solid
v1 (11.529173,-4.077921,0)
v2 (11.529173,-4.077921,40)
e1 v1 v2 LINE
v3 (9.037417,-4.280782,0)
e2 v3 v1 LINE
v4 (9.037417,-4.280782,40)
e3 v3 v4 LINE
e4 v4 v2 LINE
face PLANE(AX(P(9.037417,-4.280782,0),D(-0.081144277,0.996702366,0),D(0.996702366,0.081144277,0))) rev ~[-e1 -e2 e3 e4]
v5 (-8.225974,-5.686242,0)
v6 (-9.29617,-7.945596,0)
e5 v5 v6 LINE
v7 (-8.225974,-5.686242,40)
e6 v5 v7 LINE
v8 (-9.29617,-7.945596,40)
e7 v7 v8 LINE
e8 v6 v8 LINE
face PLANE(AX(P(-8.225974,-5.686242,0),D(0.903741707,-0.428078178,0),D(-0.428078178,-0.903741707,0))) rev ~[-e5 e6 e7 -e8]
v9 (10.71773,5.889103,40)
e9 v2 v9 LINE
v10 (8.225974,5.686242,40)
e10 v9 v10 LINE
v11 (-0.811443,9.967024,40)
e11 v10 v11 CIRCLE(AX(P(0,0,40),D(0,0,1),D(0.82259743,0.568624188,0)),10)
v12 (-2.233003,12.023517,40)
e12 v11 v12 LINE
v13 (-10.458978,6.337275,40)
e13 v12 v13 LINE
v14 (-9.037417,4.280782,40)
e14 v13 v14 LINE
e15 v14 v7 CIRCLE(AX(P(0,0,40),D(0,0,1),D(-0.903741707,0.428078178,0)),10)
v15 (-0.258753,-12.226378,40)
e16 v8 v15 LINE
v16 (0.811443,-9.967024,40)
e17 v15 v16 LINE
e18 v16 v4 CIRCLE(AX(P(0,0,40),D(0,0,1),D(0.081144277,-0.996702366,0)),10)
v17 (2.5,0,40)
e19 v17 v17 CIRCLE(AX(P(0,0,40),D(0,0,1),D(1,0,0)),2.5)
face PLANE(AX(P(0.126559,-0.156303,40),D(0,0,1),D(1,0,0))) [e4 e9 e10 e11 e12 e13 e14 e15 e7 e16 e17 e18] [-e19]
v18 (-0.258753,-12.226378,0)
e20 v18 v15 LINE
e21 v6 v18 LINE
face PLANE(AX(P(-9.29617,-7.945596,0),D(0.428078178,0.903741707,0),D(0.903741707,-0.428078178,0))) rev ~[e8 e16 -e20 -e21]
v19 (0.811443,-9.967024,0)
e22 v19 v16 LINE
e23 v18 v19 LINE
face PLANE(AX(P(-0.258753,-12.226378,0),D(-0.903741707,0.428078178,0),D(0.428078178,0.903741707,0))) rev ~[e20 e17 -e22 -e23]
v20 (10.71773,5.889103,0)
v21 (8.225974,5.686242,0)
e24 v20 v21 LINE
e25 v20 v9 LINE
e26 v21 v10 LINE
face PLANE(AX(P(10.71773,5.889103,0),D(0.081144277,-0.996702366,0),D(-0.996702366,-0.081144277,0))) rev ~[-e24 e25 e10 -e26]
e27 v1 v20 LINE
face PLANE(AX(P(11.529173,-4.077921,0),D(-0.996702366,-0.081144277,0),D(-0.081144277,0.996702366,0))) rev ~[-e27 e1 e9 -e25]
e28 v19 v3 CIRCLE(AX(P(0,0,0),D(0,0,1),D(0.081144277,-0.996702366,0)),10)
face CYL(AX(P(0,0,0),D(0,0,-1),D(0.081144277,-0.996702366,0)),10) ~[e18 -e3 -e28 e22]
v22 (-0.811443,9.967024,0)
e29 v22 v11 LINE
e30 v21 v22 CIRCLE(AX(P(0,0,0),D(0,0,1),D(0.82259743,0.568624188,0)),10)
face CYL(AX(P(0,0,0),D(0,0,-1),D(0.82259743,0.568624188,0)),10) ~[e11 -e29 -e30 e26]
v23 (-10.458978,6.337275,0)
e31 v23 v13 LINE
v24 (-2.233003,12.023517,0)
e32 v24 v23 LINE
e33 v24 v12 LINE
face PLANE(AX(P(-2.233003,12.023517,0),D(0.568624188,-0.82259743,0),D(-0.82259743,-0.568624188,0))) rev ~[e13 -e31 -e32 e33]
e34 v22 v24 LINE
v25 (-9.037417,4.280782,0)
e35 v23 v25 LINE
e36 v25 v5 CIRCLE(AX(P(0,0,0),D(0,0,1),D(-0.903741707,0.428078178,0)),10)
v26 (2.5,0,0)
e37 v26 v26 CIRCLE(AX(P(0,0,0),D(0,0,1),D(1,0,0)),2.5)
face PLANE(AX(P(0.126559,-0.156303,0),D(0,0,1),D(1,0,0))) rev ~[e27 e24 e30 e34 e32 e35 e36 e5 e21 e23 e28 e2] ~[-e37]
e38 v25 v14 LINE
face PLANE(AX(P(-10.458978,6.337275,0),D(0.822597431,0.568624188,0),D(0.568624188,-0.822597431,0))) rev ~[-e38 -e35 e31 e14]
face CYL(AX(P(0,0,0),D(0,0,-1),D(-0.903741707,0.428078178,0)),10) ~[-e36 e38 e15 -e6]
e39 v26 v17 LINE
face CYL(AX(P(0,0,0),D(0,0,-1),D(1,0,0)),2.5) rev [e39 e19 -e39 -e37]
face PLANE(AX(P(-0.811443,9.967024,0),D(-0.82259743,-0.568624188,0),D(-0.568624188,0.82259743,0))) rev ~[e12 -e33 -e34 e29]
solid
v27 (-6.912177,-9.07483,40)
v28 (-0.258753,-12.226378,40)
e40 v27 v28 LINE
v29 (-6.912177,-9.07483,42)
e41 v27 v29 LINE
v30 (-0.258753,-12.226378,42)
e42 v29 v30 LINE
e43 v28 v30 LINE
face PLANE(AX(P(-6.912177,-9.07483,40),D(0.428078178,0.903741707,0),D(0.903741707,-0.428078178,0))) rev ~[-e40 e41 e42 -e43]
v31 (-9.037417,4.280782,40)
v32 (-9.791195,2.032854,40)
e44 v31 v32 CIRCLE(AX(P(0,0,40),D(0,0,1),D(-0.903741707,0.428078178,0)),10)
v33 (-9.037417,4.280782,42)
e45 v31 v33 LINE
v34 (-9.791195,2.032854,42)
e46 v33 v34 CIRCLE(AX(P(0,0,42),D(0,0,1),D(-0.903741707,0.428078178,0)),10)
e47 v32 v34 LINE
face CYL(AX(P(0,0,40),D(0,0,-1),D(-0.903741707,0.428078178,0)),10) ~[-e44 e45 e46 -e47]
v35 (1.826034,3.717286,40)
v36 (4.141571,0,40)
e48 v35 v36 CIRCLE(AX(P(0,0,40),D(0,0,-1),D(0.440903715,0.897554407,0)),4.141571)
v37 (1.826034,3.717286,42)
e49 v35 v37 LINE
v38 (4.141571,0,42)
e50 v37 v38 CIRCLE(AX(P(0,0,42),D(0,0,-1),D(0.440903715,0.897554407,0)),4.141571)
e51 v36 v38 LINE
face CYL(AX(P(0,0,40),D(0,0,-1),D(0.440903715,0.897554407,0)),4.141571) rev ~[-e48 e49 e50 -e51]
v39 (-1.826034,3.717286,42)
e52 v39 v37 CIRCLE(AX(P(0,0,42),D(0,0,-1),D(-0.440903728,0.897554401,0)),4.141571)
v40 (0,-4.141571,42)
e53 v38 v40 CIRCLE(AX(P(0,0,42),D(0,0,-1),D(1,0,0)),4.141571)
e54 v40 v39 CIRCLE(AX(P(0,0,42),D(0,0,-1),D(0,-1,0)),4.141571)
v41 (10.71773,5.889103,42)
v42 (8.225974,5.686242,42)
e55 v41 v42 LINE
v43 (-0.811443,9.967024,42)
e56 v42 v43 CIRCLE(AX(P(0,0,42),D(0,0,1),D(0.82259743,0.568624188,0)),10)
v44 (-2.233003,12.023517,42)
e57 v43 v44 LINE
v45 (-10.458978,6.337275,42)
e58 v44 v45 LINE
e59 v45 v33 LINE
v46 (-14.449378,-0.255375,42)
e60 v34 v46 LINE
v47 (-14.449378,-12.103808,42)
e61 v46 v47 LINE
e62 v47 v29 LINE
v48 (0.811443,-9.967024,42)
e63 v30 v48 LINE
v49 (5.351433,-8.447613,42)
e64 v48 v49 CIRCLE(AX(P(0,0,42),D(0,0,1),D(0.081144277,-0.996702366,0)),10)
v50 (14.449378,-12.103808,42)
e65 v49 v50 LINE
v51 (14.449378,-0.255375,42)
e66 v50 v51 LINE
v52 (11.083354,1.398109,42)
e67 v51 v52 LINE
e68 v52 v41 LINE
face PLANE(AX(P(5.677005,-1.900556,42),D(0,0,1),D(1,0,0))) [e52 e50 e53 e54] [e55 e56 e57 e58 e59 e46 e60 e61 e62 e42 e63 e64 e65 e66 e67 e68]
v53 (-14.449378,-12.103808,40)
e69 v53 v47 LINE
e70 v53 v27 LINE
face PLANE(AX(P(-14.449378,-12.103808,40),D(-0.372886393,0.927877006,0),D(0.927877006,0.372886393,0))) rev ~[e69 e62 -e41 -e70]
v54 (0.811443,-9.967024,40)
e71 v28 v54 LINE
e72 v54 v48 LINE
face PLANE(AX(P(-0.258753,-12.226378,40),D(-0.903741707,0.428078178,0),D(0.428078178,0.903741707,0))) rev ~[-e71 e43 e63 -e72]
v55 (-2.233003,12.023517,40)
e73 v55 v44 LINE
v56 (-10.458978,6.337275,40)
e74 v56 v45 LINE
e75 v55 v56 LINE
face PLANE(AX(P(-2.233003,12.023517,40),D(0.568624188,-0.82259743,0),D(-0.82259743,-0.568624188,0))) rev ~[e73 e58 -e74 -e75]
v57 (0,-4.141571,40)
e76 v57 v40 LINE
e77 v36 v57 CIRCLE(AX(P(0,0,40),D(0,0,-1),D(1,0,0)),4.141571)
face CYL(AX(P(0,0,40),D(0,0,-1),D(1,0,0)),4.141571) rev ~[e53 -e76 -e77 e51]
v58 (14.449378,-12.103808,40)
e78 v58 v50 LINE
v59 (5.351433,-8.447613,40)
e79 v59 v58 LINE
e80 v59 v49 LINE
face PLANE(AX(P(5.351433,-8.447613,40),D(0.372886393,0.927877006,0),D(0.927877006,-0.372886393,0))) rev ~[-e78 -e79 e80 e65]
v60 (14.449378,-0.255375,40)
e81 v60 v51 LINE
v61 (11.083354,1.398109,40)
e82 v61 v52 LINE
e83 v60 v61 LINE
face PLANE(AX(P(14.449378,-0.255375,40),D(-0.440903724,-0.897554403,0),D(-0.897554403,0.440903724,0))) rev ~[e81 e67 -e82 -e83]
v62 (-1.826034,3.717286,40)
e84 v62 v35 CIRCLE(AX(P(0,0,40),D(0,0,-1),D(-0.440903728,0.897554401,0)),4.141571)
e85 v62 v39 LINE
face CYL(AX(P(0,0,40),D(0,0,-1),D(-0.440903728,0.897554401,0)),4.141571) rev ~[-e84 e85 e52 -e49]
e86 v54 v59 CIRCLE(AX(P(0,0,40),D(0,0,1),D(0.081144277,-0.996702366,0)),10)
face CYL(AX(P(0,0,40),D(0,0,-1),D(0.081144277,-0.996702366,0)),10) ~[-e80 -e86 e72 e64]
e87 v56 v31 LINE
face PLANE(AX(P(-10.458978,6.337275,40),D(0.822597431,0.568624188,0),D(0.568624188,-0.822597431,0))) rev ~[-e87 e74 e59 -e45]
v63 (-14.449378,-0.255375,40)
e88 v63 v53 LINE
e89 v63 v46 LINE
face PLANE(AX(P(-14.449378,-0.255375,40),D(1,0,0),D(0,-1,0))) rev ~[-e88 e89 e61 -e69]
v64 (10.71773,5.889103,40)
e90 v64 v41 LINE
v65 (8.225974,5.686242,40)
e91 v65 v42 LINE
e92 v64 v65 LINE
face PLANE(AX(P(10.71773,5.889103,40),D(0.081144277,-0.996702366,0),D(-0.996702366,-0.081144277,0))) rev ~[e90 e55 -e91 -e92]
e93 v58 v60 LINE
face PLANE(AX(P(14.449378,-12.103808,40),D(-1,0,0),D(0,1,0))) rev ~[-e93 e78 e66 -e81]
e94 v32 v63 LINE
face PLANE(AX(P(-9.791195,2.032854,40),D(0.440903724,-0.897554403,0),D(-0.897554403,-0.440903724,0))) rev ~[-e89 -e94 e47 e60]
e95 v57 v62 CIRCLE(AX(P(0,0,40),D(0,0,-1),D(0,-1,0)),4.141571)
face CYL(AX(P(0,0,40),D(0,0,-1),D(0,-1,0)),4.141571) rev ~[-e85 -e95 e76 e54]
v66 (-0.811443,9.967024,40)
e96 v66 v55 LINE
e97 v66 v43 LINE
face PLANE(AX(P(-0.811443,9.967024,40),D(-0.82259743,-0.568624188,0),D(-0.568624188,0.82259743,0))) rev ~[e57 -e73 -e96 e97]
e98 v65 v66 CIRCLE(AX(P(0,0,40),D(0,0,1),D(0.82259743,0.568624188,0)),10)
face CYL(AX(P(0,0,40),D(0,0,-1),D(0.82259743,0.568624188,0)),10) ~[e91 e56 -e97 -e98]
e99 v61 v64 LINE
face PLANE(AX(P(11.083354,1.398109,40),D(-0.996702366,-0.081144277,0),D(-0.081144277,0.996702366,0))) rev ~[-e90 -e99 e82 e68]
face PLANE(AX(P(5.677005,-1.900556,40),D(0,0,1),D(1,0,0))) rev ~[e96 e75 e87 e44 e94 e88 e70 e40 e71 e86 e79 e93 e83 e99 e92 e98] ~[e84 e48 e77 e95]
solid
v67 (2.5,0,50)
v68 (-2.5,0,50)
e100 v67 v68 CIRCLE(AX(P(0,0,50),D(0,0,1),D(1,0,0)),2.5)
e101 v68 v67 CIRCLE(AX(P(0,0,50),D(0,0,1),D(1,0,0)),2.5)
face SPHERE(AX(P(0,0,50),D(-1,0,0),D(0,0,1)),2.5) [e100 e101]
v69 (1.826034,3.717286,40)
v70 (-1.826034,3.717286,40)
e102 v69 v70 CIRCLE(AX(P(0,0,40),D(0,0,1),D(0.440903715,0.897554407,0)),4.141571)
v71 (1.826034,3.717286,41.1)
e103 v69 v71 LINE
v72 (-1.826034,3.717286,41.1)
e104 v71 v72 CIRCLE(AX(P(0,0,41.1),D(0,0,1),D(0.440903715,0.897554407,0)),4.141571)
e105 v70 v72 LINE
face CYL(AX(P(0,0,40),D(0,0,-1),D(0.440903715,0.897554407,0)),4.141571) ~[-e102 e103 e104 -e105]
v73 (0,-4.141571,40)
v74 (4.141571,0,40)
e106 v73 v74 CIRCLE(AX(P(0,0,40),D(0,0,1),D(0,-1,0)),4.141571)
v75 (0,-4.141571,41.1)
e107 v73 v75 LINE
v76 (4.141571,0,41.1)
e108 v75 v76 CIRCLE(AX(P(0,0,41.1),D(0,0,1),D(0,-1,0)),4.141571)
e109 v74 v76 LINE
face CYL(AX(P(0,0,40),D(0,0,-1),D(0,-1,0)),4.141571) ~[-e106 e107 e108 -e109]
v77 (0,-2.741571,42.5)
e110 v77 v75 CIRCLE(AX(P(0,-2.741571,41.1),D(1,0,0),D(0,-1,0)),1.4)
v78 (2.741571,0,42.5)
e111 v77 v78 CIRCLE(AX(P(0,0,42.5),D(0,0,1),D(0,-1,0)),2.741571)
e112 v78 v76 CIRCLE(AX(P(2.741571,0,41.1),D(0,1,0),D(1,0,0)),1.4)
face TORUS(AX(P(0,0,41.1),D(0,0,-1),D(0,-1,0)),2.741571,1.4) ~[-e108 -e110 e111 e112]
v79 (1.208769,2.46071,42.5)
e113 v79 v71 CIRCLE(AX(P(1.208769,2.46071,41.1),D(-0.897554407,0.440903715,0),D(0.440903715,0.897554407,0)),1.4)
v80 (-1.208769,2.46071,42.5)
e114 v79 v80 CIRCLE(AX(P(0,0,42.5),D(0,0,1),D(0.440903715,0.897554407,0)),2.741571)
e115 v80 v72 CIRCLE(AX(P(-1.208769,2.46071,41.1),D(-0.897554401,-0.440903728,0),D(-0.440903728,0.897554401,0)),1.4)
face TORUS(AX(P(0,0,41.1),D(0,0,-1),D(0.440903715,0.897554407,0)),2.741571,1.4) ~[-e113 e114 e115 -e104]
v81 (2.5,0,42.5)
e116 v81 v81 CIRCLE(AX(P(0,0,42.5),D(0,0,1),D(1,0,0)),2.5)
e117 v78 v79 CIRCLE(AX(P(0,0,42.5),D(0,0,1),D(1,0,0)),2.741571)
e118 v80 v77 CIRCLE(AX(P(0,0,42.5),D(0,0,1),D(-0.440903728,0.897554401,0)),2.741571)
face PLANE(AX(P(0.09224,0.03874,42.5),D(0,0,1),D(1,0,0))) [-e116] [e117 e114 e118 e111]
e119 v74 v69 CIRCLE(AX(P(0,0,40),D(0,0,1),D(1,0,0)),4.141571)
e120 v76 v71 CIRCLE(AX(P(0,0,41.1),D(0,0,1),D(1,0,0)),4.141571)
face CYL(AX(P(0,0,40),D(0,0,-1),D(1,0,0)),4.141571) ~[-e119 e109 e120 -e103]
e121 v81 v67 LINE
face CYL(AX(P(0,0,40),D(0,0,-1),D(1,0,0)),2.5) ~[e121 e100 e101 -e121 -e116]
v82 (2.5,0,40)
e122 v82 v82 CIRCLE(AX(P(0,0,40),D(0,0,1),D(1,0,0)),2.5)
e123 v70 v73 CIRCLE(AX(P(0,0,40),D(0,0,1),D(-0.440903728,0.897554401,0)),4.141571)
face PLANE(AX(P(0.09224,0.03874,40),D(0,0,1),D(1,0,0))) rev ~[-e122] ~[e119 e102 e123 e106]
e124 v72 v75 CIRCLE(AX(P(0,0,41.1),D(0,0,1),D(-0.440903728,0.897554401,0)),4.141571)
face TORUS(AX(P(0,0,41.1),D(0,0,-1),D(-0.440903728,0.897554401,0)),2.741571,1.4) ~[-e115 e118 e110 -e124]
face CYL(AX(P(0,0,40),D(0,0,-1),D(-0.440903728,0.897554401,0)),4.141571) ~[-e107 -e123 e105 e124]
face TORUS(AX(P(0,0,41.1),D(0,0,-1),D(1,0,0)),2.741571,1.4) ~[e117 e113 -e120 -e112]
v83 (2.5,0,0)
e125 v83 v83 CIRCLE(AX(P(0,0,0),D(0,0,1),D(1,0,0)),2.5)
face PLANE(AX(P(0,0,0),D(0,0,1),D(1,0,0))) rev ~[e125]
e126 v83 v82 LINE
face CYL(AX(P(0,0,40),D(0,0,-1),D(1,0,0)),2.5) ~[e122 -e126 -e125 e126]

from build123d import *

# Parameters (mm, degrees)
F0_R     = 2.5
F1_DEPTH = 40
F2_DEPTH = 40
F3_R     = 2.5
F4_DEPTH = 10
F5_DEPTH = 2.5
F8_R     = 1.4
F9_DEPTH = 2


with BuildPart() as f1:
    # F0 (on Top) → F1 (new body)
    with BuildSketch(Plane.XY):
        with BuildLine():
            ThreePointArc((9.0374170739, -4.2807817782), (9.7563869014, -2.1938355979), (10, 0))
            ThreePointArc((10, 0), (9.5461967047, 2.9782760912), (8.2259743049, 5.6862418815))
            ThreePointArc((8.2259743049, 5.6862418815), (4.2807817782, 9.0374170739), (-0.8114427689, 9.9670236597))
            Line((-0.8114427689, 9.9670236597), (-9.0374170739, 4.2807817782))
            ThreePointArc((-9.0374170739, 4.2807817782), (-9.9670236597, -0.8114427689), (-8.2259743049, -5.6862418815))
            ThreePointArc((-8.2259743049, -5.6862418815), (-4.2807817782, -9.0374170739), (0.8114427689, -9.9670236597))
            ThreePointArc((0.8114427689, -9.9670236597), (5.6862418815, -8.2259743049), (9.0374170739, -4.2807817782))
        make_face()
        Circle(F0_R, mode=Mode.SUBTRACT)
        with BuildLine():
            ThreePointArc((8.2259743049, 5.6862418815), (9.5461967047, 2.9782760912), (10, 0))
            ThreePointArc((10, 0), (9.7563869014, -2.1938355979), (9.0374170739, -4.2807817782))
            Line((9.0374170739, -4.2807817782), (11.5291729888, -4.077921086))
            Line((11.5291729888, -4.077921086), (10.7177302199, 5.8891025737))
            Line((10.7177302199, 5.8891025737), (8.2259743049, 5.6862418815))
        make_face()
        with BuildLine():
            Line((-9.0374170739, 4.2807817782), (-0.8114427689, 9.9670236597))
            ThreePointArc((-0.8114427689, 9.9670236597), (-5.6862418815, 8.2259743049), (-9.0374170739, 4.2807817782))
        make_face()
        with BuildLine():
            ThreePointArc((-9.0374170739, 4.2807817782), (-5.6862418815, 8.2259743049), (-0.8114427689, 9.9670236597))
            Line((-0.8114427689, 9.9670236597), (-2.2330032393, 12.0235172359))
            Line((-2.2330032393, 12.0235172359), (-10.4589775442, 6.3372753545))
            Line((-10.4589775442, 6.3372753545), (-9.0374170739, 4.2807817782))
        make_face()
        with BuildLine():
            Line((-0.2587526756, -12.2263779282), (0.8114427689, -9.9670236597))
            ThreePointArc((0.8114427689, -9.9670236597), (-4.2807817782, -9.0374170739), (-8.2259743049, -5.6862418815))
            Line((-8.2259743049, -5.6862418815), (-9.2961697495, -7.9455961499))
            Line((-9.2961697495, -7.9455961499), (-0.2587526756, -12.2263779282))
        make_face()
    extrude(amount=F1_DEPTH)


with BuildPart() as f2:
    # F0 (on Top) → F2 (new body)
    with BuildSketch(Plane.XY):
        Circle(F0_R)
    extrude(amount=F2_DEPTH)

    # F3 (on face) → F4 (join)
    with BuildSketch(Plane.XY.offset(40)):
        Circle(F3_R)
    extrude(amount=F4_DEPTH)

    # F3 (on face) → F5 (join)
    with BuildSketch(Plane.XY.offset(40)):
        with BuildLine():
            ThreePointArc((1.8260342345, 3.7172857004), (-2.93e-08, 4.1415714414), (-1.8260342871, 3.7172856746))
            ThreePointArc((-1.8260342871, 3.7172856746), (-4.0341057369, -0.9373392702), (0, -4.1415714414))
            ThreePointArc((0, -4.1415714414), (2.928533251, -2.928533251), (4.1415714414, 0))
            ThreePointArc((4.1415714414, 0), (3.5153424613, 2.1897445933), (1.8260342345, 3.7172857004))
        make_face()
        Circle(F3_R, mode=Mode.SUBTRACT)
    extrude(amount=F5_DEPTH)

    # F6 (on Front) → F7 (revolve)
    with BuildSketch(Plane.XZ):
        with BuildLine():
            Line((-2.5, 50), (2.5, 50))
            ThreePointArc((2.5, 50), (0, 52.5), (-2.5, 50))
        make_face()
    revolve(axis=Axis((0, 0, 50), (-1, 0, 0)))

    # F8
    f8_edges = [f2.edges().sort_by_distance(p)[0] for p in [
        (1.826034, -3.717286, 42.5),
    ]]
    fillet(f8_edges, radius=F8_R)


with BuildPart() as f9:
    # F3 (on face) → F9 (new body)
    with BuildSketch(Plane.XY.offset(40)):
        with BuildLine():
            Line((11.2723216959, -0.9229938236), (1.8260342345, 3.7172857004))
            ThreePointArc((1.8260342345, 3.7172857004), (3.5153424613, 2.1897445933), (4.1415714414, 0))
            ThreePointArc((4.1415714414, 0), (2.928533251, -2.928533251), (0, -4.1415714414))
            Line((0, -4.1415714414), (7.1333343578, -7.008248065))
            ThreePointArc((7.1333343578, -7.008248065), (8.1995773399, -5.7242406874), (9.0374170739, -4.2807817782))
            Line((9.0374170739, -4.2807817782), (11.5291729888, -4.077921086))
            Line((11.5291729888, -4.077921086), (11.2723216959, -0.9229938236))
        make_face()
        with BuildLine():
            Line((1.8260342345, 3.7172857004), (0, 4.6142845799))
            Line((0, 4.6142845799), (-1.8260342871, 3.7172856746))
            ThreePointArc((-1.8260342871, 3.7172856746), (-2.93e-08, 4.1415714414), (1.8260342345, 3.7172857004))
        make_face()
        with BuildLine():
            ThreePointArc((-8.2259743049, -5.6862418815), (-9.5010919758, -3.1191747736), (-9.9956228645, -0.2958437956))
            Line((-9.9956228645, -0.2958437956), (-14.4493776544, -2.4836522061))
            Line((-14.4493776544, -2.4836522061), (-14.4493776544, -9.9483500207))
            Line((-14.4493776544, -9.9483500207), (-9.2562886562, -7.861400764))
            Line((-9.2562886562, -7.861400764), (-8.2259743049, -5.6862418815))
        make_face()
        with BuildLine():
            ThreePointArc((0, -4.1415714414), (-4.0341057369, -0.9373392702), (-1.8260342871, 3.7172856746))
            Line((-1.8260342871, 3.7172856746), (-9.9956228645, -0.2958437956))
            ThreePointArc((-9.9956228645, -0.2958437956), (-9.5010919758, -3.1191747736), (-8.2259743049, -5.6862418815))
            Line((-8.2259743049, -5.6862418815), (-9.2562886562, -7.861400764))
            Line((-9.2562886562, -7.861400764), (0, -4.1415714414))
        make_face()
        with BuildLine():
            Line((14.4493776544, -2.4836522061), (11.2723216959, -0.9229938236))
            Line((11.2723216959, -0.9229938236), (11.5291729888, -4.077921086))
            Line((11.5291729888, -4.077921086), (9.0374170739, -4.2807817782))
            ThreePointArc((9.0374170739, -4.2807817782), (8.1995773399, -5.7242406874), (7.1333343578, -7.008248065))
            Line((7.1333343578, -7.008248065), (14.4493776544, -9.9483500207))
            Line((14.4493776544, -9.9483500207), (14.4493776544, -2.4836522061))
        make_face()
        with BuildLine():
            Line((-14.4493776544, -2.4836522061), (-9.9956228645, -0.2958437956))
            ThreePointArc((-9.9956228645, -0.2958437956), (-9.9616891791, 0.8744991134), (-9.7911952771, 2.0328539162))
            Line((-9.7911952771, 2.0328539162), (-14.4493776544, -0.2553750195))
            Line((-14.4493776544, -0.2553750195), (-14.4493776544, -2.4836522061))
        make_face()
        Polygon((11.0833543073, 1.398109408), (11.2723216959, -0.9229938236), (14.4493776544, -2.4836522061), (14.4493776544, -0.2553750195), align=None)
        with BuildLine():
            Line((14.4493776544, -9.9483500207), (7.1333343578, -7.008248065))
            ThreePointArc((7.1333343578, -7.008248065), (6.2837328899, -7.7791195497), (5.3514333814, -8.4476127258))
            Line((5.3514333814, -8.4476127258), (14.4493776544, -12.1038081124))
            Line((14.4493776544, -12.1038081124), (14.4493776544, -9.9483500207))
        make_face()
        Polygon((-9.2961697495, -7.9455961499), (-9.2562886562, -7.861400764), (-14.4493776544, -9.9483500207), (-14.4493776544, -12.1038081124), (-6.9121769502, -9.0748295195), align=None)
        with BuildLine():
            Line((-1.8260342871, 3.7172856746), (0, 4.6142845799))
            Line((0, 4.6142845799), (1.8260342345, 3.7172857004))
            Line((1.8260342345, 3.7172857004), (11.2723216959, -0.9229938236))
            Line((11.2723216959, -0.9229938236), (11.0833543073, 1.398109408))
            Line((11.0833543073, 1.398109408), (0, 6.8425617666))
            Line((0, 6.8425617666), (-9.7911952771, 2.0328539162))
            ThreePointArc((-9.7911952771, 2.0328539162), (-9.9616891791, 0.8744991134), (-9.9956228645, -0.2958437956))
            Line((-9.9956228645, -0.2958437956), (-1.8260342871, 3.7172856746))
        make_face()
        with BuildLine():
            Line((7.1333343578, -7.008248065), (0, -4.1415714414))
            Line((0, -4.1415714414), (-9.2562886562, -7.861400764))
            Line((-9.2562886562, -7.861400764), (-9.2961697495, -7.9455961499))
            Line((-9.2961697495, -7.9455961499), (-6.9121769502, -9.0748295195))
            Line((-6.9121769502, -9.0748295195), (-0.2587526756, -12.2263779282))
            Line((-0.2587526756, -12.2263779282), (0.8114427689, -9.9670236597))
            ThreePointArc((0.8114427689, -9.9670236597), (3.1737065093, -9.4830157119), (5.3514333814, -8.4476127258))
            ThreePointArc((5.3514333814, -8.4476127258), (6.2837328899, -7.7791195497), (7.1333343578, -7.008248065))
        make_face()
        with BuildLine():
            ThreePointArc((-9.0374170739, 4.2807817782), (-9.4811632031, 3.1792364359), (-9.7911952771, 2.0328539162))
            Line((-9.7911952771, 2.0328539162), (0, 6.8425617666))
            Line((0, 6.8425617666), (11.0833543073, 1.398109408))
            Line((11.0833543073, 1.398109408), (10.7177302199, 5.8891025737))
            Line((10.7177302199, 5.8891025737), (8.2259743049, 5.6862418815))
            ThreePointArc((8.2259743049, 5.6862418815), (4.2807817782, 9.0374170739), (-0.8114427689, 9.9670236597))
            Line((-0.8114427689, 9.9670236597), (-2.2330032393, 12.0235172359))
            Line((-2.2330032393, 12.0235172359), (-10.4589775442, 6.3372753545))
            Line((-10.4589775442, 6.3372753545), (-9.0374170739, 4.2807817782))
        make_face()
    extrude(amount=F9_DEPTH)


solid = Compound([f1.part, f2.part, f9.part])
